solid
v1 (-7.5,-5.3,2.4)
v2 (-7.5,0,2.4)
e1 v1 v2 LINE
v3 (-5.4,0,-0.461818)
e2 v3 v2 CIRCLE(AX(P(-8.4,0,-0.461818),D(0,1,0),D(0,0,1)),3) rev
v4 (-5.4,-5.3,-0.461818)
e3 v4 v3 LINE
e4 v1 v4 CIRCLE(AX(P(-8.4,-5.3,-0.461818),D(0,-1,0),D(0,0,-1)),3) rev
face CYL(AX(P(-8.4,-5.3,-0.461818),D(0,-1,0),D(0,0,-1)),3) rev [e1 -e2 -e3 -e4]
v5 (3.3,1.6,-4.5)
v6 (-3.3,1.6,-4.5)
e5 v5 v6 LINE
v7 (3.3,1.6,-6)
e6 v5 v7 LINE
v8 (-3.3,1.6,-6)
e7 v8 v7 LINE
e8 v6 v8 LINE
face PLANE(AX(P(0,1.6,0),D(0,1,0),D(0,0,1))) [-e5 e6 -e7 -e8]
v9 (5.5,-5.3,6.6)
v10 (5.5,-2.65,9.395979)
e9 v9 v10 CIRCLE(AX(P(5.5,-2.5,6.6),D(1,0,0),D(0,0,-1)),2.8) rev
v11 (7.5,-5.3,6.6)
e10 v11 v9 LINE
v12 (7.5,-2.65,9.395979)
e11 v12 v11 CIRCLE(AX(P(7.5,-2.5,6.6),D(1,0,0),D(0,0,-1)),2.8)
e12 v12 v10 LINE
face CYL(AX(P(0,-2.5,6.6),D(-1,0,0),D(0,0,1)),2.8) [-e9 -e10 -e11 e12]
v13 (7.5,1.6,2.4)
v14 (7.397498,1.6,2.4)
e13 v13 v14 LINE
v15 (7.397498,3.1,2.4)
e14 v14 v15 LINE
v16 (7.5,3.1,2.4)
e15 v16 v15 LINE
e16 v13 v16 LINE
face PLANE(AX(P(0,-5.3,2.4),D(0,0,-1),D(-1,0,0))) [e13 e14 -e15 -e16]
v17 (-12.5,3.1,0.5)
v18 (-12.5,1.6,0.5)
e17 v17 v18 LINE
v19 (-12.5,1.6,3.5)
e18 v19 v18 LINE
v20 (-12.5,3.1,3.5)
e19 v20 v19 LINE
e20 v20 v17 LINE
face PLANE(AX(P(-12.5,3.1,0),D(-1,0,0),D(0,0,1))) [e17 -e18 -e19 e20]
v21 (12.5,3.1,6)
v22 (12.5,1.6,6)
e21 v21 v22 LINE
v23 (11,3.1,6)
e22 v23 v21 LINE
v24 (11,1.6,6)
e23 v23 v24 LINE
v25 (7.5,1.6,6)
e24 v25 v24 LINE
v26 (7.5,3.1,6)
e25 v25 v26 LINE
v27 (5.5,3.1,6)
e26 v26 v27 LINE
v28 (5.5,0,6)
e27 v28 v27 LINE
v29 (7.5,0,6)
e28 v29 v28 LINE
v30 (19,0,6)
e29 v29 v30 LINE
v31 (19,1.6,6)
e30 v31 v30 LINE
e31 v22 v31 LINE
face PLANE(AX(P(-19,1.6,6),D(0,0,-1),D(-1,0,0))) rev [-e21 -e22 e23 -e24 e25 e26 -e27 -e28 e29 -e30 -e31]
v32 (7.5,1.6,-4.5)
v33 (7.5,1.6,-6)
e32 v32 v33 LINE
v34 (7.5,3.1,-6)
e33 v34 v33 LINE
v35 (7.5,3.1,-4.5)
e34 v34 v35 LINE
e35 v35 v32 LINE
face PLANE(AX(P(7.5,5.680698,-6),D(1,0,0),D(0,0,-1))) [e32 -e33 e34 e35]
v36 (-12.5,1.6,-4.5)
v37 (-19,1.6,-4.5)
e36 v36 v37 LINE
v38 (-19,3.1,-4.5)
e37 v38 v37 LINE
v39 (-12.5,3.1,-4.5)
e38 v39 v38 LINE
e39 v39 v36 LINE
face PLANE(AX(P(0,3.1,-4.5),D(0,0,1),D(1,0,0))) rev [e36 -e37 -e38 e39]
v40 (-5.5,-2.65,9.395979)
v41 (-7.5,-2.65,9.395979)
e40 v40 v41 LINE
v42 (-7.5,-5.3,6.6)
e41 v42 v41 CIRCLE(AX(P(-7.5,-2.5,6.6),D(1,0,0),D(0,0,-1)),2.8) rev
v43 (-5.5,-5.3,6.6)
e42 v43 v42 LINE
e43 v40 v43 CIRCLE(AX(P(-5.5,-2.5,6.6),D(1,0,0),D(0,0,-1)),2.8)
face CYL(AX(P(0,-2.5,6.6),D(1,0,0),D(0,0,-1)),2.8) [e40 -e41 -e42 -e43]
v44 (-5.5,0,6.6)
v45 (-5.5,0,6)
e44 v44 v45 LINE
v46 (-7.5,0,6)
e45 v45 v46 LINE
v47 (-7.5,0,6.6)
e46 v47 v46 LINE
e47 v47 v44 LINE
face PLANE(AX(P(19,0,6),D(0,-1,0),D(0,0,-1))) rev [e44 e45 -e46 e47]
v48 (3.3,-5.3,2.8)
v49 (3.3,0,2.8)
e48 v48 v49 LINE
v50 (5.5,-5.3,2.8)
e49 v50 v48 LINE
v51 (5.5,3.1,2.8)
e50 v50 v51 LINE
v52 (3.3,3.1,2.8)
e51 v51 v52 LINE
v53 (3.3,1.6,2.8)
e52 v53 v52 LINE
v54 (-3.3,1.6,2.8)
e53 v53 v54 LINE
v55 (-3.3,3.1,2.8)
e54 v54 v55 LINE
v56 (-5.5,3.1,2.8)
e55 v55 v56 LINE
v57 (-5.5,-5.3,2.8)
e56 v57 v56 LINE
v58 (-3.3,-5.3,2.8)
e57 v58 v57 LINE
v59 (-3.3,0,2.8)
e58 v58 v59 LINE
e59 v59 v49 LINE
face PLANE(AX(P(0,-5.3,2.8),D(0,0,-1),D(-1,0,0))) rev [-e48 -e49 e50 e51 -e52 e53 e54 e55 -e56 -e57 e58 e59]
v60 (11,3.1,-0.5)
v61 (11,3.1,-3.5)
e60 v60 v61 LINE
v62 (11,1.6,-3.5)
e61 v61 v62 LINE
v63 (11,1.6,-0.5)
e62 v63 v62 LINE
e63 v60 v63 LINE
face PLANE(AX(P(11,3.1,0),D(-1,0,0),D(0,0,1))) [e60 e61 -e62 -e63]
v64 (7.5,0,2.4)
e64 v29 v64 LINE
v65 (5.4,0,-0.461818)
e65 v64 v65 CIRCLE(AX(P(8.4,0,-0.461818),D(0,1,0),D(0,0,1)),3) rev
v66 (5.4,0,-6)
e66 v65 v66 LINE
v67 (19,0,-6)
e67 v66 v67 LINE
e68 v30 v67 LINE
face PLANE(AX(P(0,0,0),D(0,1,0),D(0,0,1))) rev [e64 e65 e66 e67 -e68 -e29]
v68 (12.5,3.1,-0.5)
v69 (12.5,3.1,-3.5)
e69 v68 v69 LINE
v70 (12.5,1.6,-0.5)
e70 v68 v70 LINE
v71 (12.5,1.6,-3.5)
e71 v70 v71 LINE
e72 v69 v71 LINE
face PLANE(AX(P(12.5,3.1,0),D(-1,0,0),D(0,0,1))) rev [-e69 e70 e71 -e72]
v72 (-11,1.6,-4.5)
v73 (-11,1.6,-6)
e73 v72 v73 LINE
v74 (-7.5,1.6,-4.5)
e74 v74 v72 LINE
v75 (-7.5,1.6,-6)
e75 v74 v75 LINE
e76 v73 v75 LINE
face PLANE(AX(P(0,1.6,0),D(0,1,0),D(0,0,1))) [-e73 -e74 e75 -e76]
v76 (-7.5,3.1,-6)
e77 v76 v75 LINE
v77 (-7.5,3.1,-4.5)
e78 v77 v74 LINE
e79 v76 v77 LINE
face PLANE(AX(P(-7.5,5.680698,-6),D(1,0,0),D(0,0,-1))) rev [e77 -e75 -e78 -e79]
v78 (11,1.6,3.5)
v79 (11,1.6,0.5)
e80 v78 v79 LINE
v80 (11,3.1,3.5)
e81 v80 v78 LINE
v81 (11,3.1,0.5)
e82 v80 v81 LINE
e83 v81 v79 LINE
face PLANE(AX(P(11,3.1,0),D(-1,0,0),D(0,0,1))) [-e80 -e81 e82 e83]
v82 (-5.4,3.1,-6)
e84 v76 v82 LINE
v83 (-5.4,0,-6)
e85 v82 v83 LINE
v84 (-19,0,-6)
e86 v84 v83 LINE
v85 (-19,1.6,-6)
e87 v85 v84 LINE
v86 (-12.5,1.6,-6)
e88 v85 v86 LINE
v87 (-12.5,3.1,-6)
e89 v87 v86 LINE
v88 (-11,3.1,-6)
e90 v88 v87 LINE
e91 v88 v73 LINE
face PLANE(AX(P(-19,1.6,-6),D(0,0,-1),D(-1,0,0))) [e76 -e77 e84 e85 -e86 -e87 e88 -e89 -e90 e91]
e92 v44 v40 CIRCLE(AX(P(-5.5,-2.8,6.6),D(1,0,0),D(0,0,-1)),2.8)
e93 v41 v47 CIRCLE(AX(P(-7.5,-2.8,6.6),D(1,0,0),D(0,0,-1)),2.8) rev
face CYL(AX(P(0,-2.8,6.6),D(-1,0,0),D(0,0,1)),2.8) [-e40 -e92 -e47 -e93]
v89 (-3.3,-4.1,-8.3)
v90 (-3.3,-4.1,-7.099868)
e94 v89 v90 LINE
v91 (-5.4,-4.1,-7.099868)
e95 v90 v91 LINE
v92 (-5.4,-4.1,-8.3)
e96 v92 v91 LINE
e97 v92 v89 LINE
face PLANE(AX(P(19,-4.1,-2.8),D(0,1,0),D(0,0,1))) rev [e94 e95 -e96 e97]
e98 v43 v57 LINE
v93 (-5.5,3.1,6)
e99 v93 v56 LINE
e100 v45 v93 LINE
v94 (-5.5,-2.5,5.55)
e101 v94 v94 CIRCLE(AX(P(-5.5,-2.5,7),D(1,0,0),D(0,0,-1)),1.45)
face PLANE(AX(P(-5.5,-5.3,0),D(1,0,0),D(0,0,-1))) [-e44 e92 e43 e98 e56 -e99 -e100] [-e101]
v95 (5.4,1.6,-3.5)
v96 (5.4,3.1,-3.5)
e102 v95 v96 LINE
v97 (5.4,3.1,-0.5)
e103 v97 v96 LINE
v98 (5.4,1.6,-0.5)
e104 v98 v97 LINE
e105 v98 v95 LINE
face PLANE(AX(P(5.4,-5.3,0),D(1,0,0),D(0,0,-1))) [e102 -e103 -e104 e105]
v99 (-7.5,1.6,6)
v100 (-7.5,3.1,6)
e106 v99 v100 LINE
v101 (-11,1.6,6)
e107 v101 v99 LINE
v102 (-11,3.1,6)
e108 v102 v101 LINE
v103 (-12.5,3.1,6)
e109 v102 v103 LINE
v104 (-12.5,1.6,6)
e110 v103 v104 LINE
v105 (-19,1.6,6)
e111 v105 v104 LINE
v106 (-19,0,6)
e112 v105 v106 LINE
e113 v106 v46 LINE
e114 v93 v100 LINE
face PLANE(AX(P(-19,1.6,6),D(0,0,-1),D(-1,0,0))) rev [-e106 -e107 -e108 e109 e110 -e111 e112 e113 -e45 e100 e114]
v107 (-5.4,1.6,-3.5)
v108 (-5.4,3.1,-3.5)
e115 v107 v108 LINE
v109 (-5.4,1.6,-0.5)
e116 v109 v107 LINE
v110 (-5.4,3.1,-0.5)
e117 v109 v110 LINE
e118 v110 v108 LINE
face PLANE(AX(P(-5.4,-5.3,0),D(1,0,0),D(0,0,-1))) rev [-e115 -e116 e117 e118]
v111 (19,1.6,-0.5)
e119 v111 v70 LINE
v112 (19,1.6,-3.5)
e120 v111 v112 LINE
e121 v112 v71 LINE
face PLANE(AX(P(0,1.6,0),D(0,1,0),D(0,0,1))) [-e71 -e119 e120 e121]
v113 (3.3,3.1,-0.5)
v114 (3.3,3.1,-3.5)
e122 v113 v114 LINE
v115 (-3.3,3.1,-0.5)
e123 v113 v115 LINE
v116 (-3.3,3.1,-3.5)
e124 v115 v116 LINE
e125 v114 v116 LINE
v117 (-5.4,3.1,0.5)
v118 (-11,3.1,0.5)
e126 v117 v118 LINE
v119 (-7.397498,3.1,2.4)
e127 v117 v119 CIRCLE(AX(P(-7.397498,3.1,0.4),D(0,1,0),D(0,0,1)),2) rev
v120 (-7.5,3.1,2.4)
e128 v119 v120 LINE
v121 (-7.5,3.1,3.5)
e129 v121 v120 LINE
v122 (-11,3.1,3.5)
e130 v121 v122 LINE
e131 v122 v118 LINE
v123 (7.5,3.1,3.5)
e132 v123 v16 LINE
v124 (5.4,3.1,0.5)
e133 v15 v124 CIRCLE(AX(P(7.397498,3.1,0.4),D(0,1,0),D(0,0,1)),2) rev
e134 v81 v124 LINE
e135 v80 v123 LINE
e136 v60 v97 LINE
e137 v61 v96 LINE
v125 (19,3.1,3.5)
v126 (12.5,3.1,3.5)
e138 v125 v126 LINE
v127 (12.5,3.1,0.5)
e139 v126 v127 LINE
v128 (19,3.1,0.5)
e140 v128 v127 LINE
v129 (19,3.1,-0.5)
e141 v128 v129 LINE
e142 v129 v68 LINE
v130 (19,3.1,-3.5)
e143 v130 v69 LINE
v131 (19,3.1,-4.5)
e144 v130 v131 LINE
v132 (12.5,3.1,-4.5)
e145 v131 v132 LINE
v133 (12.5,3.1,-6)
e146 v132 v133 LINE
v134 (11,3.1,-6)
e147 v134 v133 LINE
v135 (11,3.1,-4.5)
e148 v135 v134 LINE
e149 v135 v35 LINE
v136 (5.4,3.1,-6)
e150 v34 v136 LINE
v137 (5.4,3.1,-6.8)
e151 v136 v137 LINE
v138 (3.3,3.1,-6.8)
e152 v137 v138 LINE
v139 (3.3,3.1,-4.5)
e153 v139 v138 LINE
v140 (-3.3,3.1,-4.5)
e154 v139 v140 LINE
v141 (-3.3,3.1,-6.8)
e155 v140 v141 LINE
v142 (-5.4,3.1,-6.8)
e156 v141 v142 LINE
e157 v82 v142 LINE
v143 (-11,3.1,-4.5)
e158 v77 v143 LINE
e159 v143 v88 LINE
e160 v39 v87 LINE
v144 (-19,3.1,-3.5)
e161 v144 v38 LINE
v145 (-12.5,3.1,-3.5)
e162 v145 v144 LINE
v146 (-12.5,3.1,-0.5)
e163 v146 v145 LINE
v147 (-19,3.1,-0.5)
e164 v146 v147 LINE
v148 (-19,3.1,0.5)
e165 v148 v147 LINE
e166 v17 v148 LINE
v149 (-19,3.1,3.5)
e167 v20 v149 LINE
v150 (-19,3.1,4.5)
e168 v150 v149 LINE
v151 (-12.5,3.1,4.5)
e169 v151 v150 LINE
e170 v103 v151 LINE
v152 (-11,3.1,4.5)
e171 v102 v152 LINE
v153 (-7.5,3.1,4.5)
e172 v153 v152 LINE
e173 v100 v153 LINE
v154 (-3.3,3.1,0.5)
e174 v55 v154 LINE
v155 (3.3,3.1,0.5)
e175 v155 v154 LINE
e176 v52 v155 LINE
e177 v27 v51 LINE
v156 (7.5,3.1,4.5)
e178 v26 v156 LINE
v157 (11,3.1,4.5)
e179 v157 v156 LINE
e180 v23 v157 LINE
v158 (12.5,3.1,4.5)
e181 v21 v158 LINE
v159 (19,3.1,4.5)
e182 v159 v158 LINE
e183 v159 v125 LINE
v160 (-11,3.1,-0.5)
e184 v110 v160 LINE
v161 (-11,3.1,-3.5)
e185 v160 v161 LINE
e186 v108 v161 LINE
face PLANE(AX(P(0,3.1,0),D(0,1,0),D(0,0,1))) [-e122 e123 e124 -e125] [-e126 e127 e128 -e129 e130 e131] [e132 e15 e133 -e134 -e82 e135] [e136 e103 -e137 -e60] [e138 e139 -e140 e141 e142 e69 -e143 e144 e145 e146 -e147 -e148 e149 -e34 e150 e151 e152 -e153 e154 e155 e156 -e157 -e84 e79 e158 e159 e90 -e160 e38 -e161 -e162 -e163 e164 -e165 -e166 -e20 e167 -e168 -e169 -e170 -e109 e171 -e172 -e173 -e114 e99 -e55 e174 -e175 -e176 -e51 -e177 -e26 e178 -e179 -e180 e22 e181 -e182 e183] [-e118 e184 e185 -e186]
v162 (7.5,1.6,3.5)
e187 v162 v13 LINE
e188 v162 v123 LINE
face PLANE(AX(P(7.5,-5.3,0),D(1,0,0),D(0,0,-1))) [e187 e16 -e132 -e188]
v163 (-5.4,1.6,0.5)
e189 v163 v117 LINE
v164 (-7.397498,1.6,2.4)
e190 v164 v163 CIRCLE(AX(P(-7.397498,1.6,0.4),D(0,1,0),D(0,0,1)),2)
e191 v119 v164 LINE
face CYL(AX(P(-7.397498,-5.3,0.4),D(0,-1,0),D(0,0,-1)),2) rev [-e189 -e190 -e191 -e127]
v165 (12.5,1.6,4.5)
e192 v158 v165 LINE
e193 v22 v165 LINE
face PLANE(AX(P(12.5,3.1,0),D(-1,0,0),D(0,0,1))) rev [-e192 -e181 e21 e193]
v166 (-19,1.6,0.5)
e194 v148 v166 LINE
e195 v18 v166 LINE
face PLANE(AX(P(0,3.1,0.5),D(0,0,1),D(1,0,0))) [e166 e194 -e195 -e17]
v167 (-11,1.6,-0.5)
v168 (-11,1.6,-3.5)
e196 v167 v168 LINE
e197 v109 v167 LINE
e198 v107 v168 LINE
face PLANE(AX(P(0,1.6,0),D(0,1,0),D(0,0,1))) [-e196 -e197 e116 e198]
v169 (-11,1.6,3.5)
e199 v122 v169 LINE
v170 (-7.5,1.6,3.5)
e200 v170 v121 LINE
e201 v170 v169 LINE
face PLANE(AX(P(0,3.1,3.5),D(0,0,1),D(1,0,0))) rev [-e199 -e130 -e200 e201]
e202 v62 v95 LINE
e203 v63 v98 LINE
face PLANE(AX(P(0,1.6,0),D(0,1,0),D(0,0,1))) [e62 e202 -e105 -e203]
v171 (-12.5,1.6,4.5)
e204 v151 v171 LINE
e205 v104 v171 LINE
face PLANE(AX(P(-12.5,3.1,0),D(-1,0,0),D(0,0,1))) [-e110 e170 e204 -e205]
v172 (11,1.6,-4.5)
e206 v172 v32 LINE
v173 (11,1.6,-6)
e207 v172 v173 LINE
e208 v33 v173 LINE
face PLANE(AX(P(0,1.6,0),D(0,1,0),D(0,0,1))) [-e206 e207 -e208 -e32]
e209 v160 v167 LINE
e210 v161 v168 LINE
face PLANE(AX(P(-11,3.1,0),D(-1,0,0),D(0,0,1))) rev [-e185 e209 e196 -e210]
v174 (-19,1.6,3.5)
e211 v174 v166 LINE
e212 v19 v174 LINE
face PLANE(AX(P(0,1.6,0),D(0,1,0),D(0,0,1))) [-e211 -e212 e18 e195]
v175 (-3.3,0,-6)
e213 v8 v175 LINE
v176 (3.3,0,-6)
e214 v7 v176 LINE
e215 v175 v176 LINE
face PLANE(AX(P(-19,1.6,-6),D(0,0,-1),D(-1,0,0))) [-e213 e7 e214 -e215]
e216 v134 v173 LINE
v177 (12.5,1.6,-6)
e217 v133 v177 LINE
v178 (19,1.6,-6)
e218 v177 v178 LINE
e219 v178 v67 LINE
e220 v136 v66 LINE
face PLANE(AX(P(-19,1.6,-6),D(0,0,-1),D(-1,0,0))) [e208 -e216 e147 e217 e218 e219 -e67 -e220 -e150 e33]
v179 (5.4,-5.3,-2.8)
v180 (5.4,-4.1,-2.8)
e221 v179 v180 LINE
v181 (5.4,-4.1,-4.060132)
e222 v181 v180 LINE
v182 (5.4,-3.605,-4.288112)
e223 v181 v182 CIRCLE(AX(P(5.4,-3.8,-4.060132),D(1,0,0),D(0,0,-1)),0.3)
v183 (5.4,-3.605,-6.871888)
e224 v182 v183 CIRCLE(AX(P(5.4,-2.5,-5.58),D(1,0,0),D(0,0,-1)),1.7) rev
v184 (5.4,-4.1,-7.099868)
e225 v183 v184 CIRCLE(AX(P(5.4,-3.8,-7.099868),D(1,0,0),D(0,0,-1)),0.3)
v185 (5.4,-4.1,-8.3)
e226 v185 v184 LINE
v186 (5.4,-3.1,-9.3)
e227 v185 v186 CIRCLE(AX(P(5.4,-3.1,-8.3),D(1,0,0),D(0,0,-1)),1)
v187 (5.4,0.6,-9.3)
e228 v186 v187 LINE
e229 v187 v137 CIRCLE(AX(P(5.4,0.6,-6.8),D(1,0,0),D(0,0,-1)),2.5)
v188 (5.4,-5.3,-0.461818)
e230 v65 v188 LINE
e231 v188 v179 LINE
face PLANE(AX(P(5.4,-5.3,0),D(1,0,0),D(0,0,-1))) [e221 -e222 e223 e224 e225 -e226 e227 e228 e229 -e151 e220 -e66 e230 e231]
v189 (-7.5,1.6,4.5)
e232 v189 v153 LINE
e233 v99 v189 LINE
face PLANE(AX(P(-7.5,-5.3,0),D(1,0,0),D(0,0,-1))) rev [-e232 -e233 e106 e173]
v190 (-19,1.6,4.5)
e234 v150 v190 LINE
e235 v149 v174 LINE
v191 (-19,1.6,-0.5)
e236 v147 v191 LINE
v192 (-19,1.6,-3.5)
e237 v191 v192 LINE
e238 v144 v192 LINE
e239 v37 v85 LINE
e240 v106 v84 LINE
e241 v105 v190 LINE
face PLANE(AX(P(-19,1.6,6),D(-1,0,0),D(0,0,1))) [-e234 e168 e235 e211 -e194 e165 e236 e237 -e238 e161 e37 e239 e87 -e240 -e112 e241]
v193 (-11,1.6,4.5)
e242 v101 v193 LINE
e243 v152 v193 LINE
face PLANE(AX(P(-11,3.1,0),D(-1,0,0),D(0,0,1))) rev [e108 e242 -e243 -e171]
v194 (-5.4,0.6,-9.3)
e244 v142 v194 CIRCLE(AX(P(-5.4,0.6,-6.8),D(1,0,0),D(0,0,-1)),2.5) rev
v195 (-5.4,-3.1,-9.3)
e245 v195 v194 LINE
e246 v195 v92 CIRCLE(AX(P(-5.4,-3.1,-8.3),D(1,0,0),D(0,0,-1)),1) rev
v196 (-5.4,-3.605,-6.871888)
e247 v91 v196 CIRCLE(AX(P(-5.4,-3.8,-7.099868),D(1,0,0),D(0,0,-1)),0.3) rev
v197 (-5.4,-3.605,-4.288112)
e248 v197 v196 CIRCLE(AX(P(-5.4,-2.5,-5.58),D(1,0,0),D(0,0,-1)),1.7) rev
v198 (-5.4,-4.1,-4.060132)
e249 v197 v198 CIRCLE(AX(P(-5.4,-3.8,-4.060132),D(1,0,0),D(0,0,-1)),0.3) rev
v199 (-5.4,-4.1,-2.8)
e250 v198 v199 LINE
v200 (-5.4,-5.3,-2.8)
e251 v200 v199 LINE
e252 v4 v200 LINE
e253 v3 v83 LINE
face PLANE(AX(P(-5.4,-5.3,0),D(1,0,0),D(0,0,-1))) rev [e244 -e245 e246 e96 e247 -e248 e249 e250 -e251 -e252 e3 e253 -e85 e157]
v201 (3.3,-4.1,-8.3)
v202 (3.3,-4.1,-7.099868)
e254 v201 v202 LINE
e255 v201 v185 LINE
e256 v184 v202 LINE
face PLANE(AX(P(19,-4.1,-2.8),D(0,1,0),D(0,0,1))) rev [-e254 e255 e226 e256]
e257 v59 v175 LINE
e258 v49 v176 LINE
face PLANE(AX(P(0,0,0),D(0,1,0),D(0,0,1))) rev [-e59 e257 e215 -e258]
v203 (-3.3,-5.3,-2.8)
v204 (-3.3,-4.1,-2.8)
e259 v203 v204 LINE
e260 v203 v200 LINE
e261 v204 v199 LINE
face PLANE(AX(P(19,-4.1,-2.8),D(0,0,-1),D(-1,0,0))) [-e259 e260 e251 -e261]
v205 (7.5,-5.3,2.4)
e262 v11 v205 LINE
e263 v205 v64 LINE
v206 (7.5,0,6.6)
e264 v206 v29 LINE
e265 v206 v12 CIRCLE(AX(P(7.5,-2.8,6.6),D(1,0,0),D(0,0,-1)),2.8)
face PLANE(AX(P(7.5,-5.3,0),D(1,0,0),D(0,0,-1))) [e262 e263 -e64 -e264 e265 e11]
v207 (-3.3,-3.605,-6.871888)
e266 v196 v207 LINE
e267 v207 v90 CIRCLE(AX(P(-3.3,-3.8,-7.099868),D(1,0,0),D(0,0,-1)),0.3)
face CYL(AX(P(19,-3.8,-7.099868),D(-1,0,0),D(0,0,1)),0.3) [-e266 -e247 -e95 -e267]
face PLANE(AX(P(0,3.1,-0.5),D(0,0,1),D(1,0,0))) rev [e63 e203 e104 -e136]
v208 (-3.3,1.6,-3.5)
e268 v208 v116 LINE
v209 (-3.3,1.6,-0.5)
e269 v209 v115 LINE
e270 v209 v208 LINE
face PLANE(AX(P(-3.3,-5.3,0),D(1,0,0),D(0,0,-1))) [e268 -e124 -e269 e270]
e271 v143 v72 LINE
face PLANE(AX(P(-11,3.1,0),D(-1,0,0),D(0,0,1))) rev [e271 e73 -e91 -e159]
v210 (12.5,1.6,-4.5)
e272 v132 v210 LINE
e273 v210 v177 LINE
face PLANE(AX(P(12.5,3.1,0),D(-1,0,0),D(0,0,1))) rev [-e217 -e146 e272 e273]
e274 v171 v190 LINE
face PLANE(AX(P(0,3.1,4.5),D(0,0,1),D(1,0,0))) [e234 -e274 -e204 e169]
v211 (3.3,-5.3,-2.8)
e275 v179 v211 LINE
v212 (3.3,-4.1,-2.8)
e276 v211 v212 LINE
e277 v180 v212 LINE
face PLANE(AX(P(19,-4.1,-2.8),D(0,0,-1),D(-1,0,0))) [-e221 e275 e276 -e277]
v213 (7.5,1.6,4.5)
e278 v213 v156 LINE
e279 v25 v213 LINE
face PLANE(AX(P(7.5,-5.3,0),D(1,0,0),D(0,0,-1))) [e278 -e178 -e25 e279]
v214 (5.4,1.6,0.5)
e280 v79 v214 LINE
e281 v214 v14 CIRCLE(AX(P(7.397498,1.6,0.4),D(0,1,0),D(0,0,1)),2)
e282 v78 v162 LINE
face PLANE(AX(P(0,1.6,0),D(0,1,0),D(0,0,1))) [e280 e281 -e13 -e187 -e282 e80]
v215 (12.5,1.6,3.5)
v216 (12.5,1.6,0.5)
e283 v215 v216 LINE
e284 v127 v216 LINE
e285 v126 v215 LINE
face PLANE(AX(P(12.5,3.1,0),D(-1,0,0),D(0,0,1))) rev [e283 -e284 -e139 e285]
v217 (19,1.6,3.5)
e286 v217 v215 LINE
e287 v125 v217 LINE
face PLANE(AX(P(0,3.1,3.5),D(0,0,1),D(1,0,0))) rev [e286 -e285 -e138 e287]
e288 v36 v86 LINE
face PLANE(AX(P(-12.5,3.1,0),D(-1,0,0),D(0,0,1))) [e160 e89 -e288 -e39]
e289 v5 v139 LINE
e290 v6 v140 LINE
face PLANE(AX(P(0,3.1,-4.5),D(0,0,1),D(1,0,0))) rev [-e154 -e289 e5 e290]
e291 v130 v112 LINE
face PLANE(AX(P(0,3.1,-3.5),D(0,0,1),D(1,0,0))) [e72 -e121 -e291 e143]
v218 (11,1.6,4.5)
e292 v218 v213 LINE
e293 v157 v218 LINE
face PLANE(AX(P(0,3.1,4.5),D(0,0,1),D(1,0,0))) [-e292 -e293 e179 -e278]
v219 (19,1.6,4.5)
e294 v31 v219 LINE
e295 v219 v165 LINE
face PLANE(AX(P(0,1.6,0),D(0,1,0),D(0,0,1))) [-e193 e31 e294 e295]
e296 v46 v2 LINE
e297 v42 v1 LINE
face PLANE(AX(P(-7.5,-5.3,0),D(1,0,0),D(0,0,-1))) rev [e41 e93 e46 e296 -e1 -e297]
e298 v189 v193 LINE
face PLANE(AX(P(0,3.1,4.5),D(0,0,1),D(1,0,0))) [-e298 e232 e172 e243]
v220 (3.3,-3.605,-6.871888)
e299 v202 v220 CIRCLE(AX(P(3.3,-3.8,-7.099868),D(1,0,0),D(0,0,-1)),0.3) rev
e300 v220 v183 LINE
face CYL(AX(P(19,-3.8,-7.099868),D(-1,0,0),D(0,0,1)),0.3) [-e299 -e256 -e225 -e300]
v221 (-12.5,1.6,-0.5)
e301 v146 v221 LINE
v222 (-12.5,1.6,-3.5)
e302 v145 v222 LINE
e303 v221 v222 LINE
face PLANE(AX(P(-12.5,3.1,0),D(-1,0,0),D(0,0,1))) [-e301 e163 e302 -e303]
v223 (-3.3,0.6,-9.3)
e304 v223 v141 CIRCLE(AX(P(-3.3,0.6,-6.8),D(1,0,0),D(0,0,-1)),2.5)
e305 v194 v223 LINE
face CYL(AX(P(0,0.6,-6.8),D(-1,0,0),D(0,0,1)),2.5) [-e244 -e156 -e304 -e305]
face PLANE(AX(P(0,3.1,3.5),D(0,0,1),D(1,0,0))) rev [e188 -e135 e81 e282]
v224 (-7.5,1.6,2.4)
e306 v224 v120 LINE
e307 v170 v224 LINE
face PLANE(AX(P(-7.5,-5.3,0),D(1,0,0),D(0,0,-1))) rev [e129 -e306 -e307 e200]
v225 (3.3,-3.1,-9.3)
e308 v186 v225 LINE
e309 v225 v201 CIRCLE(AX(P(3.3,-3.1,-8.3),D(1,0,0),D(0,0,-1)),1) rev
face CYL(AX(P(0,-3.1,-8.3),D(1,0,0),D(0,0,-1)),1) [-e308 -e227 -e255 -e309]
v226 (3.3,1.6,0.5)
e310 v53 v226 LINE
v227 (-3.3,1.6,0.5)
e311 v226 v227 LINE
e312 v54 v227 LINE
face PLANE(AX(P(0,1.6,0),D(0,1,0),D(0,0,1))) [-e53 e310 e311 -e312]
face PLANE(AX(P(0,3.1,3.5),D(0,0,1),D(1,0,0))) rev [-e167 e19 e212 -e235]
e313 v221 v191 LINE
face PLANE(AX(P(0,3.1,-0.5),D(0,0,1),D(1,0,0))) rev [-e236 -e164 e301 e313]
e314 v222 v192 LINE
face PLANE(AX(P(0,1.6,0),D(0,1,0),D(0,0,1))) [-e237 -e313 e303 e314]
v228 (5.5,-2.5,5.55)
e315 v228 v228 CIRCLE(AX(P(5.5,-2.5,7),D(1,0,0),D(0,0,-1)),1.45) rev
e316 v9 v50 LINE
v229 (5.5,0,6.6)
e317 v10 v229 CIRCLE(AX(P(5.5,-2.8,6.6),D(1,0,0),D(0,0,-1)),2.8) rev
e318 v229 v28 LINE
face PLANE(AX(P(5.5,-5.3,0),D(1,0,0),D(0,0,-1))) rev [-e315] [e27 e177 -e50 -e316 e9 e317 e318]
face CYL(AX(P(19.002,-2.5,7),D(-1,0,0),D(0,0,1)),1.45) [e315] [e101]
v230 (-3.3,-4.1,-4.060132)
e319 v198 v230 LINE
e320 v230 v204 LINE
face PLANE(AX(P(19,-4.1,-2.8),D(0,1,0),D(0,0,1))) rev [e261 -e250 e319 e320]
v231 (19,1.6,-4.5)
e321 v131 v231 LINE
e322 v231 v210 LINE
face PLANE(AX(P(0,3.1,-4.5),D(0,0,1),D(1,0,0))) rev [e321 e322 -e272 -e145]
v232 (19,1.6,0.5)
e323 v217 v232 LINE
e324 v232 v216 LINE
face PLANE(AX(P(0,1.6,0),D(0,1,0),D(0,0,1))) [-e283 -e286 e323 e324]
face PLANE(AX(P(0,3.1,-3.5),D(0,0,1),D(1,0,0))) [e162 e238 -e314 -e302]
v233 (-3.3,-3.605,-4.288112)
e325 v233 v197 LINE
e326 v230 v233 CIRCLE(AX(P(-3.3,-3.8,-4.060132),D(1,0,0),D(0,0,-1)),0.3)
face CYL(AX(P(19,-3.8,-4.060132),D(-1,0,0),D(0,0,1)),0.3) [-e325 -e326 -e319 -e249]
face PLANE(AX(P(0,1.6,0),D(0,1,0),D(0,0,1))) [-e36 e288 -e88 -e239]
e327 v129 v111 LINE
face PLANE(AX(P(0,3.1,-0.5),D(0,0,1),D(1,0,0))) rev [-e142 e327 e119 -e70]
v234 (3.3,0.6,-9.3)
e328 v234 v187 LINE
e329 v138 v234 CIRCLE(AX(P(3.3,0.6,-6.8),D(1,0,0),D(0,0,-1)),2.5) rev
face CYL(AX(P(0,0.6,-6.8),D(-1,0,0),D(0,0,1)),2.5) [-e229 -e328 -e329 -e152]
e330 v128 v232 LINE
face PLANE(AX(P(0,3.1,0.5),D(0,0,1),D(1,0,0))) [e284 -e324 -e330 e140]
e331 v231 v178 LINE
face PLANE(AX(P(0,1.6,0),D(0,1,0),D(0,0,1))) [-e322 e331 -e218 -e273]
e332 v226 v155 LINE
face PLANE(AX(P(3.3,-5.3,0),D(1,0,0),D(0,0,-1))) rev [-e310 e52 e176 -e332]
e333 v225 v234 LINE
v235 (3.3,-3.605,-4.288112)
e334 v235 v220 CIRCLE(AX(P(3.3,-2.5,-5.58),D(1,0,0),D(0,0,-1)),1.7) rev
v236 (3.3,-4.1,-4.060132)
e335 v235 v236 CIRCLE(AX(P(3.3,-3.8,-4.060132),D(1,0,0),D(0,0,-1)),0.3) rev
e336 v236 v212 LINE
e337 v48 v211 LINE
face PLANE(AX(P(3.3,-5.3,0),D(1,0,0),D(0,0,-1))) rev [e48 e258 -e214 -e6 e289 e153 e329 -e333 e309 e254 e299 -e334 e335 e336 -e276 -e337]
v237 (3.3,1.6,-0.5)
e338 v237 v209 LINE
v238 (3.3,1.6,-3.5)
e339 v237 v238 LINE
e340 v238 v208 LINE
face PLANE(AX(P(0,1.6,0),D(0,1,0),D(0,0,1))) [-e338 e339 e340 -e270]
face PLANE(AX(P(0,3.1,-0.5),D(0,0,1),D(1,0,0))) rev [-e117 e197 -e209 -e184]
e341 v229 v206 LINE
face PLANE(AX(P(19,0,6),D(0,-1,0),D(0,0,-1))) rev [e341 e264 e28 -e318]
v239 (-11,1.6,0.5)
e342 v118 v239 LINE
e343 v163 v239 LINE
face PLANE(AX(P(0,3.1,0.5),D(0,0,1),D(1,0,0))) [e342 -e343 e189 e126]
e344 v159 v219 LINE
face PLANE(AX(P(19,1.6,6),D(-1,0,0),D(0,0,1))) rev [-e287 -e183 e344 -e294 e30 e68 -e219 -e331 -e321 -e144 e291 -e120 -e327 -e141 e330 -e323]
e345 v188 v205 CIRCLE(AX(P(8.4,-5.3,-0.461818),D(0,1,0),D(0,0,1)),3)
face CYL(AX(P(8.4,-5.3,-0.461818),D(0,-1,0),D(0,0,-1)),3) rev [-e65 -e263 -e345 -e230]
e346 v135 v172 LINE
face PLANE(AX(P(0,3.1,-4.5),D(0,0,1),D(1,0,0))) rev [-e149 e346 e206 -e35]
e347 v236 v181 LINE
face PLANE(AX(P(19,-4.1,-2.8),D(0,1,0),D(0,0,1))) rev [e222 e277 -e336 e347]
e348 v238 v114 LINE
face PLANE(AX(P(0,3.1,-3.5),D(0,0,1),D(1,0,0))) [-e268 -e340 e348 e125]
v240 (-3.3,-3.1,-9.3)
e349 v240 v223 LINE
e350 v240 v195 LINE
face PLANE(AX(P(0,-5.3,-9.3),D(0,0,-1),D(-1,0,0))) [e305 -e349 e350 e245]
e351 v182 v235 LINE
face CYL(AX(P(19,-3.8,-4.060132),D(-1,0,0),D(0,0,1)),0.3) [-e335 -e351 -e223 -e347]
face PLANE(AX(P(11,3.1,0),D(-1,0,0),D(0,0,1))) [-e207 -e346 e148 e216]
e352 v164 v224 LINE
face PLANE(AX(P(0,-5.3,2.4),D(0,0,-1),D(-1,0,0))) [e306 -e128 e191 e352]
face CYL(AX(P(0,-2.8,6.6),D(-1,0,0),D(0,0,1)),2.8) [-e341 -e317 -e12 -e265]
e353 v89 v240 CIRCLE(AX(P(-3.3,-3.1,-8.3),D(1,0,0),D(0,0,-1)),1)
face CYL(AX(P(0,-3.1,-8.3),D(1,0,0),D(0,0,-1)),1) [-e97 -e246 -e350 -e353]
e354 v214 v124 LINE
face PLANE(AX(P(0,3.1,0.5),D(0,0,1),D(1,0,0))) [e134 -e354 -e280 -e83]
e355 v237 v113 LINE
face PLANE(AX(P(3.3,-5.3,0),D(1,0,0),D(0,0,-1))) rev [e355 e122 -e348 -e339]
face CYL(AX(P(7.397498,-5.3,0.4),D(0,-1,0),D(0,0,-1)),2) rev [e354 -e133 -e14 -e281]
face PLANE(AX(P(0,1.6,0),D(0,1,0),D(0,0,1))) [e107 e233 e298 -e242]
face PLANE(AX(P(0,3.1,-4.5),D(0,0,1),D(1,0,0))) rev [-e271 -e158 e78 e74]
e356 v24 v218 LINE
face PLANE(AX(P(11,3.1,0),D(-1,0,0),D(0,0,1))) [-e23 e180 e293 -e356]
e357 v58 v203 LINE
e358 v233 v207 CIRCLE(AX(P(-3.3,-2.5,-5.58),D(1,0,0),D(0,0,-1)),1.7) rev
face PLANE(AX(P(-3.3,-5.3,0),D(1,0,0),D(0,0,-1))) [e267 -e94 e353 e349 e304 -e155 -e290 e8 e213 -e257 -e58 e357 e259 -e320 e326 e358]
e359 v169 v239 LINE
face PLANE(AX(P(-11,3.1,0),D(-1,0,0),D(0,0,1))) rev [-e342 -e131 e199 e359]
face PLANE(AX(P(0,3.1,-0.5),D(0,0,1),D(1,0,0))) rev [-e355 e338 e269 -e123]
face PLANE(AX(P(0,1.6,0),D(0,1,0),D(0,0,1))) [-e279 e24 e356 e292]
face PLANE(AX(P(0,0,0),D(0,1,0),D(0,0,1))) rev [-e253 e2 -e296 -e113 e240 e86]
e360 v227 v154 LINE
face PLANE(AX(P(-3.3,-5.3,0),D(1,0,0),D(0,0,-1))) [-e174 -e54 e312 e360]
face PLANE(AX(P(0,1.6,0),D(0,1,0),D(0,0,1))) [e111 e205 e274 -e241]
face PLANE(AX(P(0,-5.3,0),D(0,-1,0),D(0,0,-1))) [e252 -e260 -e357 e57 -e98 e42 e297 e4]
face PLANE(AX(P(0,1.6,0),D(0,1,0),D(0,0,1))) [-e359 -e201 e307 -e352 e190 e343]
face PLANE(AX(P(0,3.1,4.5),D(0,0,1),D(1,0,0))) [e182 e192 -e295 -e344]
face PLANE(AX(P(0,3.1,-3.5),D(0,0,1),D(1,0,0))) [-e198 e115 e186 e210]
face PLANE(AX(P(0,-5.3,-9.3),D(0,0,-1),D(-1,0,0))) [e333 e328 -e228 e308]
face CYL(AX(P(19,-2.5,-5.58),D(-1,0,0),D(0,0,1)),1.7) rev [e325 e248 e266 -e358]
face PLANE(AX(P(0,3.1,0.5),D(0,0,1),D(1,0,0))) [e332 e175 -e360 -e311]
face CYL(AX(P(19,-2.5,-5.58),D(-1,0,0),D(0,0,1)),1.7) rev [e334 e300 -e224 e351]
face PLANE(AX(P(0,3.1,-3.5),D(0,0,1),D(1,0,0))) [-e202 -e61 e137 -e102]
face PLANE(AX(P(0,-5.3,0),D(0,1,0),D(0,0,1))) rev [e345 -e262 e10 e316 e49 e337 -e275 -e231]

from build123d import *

# Parameters (mm, degrees)
SKETCH_1_W               = 38
SKETCH_1_H               = 12
EXTRUDE_1_DEPTH          = 1.6
EXTRUDE_START            = 1.6
SKETCH_1_3_W             = 38
SKETCH_1_3_H             = 1
SKETCH_1_3_W_2           = 1.5
SKETCH_1_3_H_2           = 12
EXTRUDE_2_DEPTH          = 1.5
EXTRUDE_START_2          = 3.1
EXTRUDE_3_DEPTH          = 8.4
SKETCH_2_4_W             = 2.1
SKETCH_2_4_H             = 1.5
EXTRUDE_5_DEPTH          = 3.1
CUT_EXTRUDE_1_DEPTH      = 22.850629282
FILLET_1_R               = 3
EXTRUDE_4_REACH          = 28.771
SKETCH_3_R               = 1.45
CUT_EXTRUDE_2_DEPTH      = 27.771253239
CUT_EXTRUDE_2_DEPTH_BACK = 27.771253239
SKETCH_3_3_R             = 1.7
SKETCH_3_3_W             = 6.5
SKETCH_3_3_H             = 1.2
SKETCH_3_3_W_2           = 3.4
SKETCH_3_3_H_2           = 3.1
FILLET_2_R               = 2.8
FILLET_3_R               = 2.5
FILLET_4_R               = 1
FILLET_5_R               = 0.3
FILLET_6_R               = 2


with BuildPart() as part:
    # 草图1 → 凸台-拉伸1 (new body)
    with BuildSketch(Plane(origin=(0, 0, 0), x_dir=(1, 0, 0), z_dir=(0, 1, 0))):
        Rectangle(SKETCH_1_W, SKETCH_1_H)
    extrude(amount=EXTRUDE_1_DEPTH)

    # 草图1<3> → 凸台-拉伸2 (add)
    with BuildSketch(Plane(origin=(0, 0, 0), x_dir=(1, 0, 0), z_dir=(0, 1, 0)).offset(EXTRUDE_START)):
        with Locations((0, 4)):
            Rectangle(SKETCH_1_3_W, SKETCH_1_3_H)
        Rectangle(SKETCH_1_3_W, SKETCH_1_3_H)
        with Locations((0, -4)):
            Rectangle(SKETCH_1_3_W, SKETCH_1_3_H)
        with Locations((-11.75, 0)):
            Rectangle(SKETCH_1_3_W_2, SKETCH_1_3_H_2)
        with Locations((11.75, 0)):
            Rectangle(SKETCH_1_3_W_2, SKETCH_1_3_H_2)
    extrude(amount=EXTRUDE_2_DEPTH)

    # 草图2 → 凸台-拉伸3 (add)
    with BuildSketch(Plane(origin=(0, 0, 0), x_dir=(1, 0, 0), z_dir=(0, 1, 0)).offset(EXTRUDE_START_2)):
        Polygon((-3.3, 9.3), (-5.4, 9.3), (-5.4, -2.4), (-7.5, -2.4), (-7.5, -9.4), (-5.5, -9.4), (-5.5, -2.8), (-3.3, -2.8), align=None)
        Polygon((5.4, 9.3), (3.3, 9.3), (3.3, -2.8), (5.5, -2.8), (5.5, -9.4), (7.5, -9.4), (7.5, -2.4), (5.4, -2.4), align=None)
    extrude(amount=-EXTRUDE_3_DEPTH)

    # 草图2<4> → 凸台-拉伸5 (add)
    with BuildSketch(Plane(origin=(0, 0, 0), x_dir=(1, 0, 0), z_dir=(0, 1, 0))):
        with Locations((-6.45, 5.25)):
            Rectangle(SKETCH_2_4_W, SKETCH_2_4_H)
        with Locations((6.45, 5.25)):
            Rectangle(SKETCH_2_4_W, SKETCH_2_4_H)
    extrude(amount=EXTRUDE_5_DEPTH)

    # 草图2<3> → 切除-拉伸1 (cut, through all)
    with BuildSketch(Plane(origin=(0, 0, 0), x_dir=(1, 0, 0), z_dir=(0, 1, 0))):
        Polygon((0, -9.4), (0, -2.8), (-3.3, -2.8), (-5.4, -2.8), (-5.5, -2.8), (-5.5, -9.4), align=None)
        Polygon((3.3, -2.8), (0, -2.8), (0, -9.4), (5.5, -9.4), (5.5, -2.8), (5.4, -2.8), align=None)
    extrude(amount=CUT_EXTRUDE_1_DEPTH, mode=Mode.SUBTRACT)

    # 圆角1
    # the kernel refuses this fillet: 3 mm, written as the material it adds along each edge
    with BuildSketch(Plane(origin=(5.4, 7.154544011, 2.4), x_dir=(1, 0, 0), z_dir=(0, -1, 0))) as fillet_1_piece_1_section:
        with BuildLine():
            CenterArc((3, -2.861817604), FILLET_1_R, 107.457603124, 72.542396876)
            Line((0, -2.861817604), (0, 0))
            Line((0, 0), (2.1, 0))
        make_face()
    fillet_1_piece_1 = extrude(amount=12.454544011, mode=Mode.PRIVATE)
    fillet_1_piece_1 = split(fillet_1_piece_1, bisect_by=Plane(origin=(6.297598678, 1.6, 1.686657362), z_dir=(0, -1, 0)), keep=Keep.TOP, mode=Mode.PRIVATE)
    add(fillet_1_piece_1)
    with BuildSketch(Plane(origin=(-5.4, 0, 2.4), x_dir=(0, 0, -1), z_dir=(0, -1, 0))) as fillet_1_piece_2:
        with BuildLine():
            CenterArc((2.861817604, -3), FILLET_1_R, 90, 72.542396876)
            Line((0, -2.1), (0, 0))
            Line((0, 0), (2.861817604, 0))
        make_face()
    extrude(amount=5.3)

    # 草图3 → 凸台-拉伸4 (add, up to next)
    with BuildSketch(Plane(origin=(-5.5, 0, 0), x_dir=(0, 0, -1), z_dir=(1, 0, 0)), mode=Mode.PRIVATE) as extrude_4_sk1:
        with Locations((-7, -2.5)):
            Circle(SKETCH_3_R)
    extrude_4_tool1 = extrude(extrude_4_sk1.sketch, amount=EXTRUDE_4_REACH, mode=Mode.PRIVATE) - part.part
    add(extrude_4_tool1.solids().sort_by_distance((-5.5, -2.5, 7))[0])

    # 草图3<3> → 切除-拉伸2 (cut, two sides: drawn at the far end of the back side and taken through both)
    with BuildSketch(Plane(origin=(-5.5, 0, 0), x_dir=(0, 0, -1), z_dir=(1, 0, 0)).offset(-CUT_EXTRUDE_2_DEPTH_BACK)):
        with Locations((5.58, -2.5)):
            Circle(SKETCH_3_3_R)
        with Locations((6.05, -4.7)):
            Rectangle(SKETCH_3_3_W, SKETCH_3_3_H)
        with Locations((-7.7, 1.55)):
            Rectangle(SKETCH_3_3_W_2, SKETCH_3_3_H_2)
    extrude(amount=CUT_EXTRUDE_2_DEPTH + CUT_EXTRUDE_2_DEPTH_BACK, mode=Mode.SUBTRACT)

    # 圆角2
    # the kernel refuses this fillet: 2.8 mm, written as the material it takes off along each edge
    with BuildSketch(Plane(origin=(-1.5, 0, 9.4), x_dir=(0, 0, -1), z_dir=(1, 0, 0)), Plane(origin=(-14.5, 0, 9.4), x_dir=(0, 0, -1), z_dir=(1, 0, 0))) as fillet_2_piece_1:
        with BuildLine():
            CenterArc((FILLET_2_R, -FILLET_2_R), FILLET_2_R, 90, 90)
            Line((0, -FILLET_2_R), (0, 0))
            Line((0, 0), (FILLET_2_R, 0))
        make_face()
    extrude(amount=16, mode=Mode.SUBTRACT)
    with BuildSketch(Plane(origin=(-1.5, -5.3, 9.4), x_dir=(0, 0, -1), z_dir=(1, 0, 0)), Plane(origin=(-14.5, -5.3, 9.4), x_dir=(0, 0, -1), z_dir=(1, 0, 0))) as fillet_2_piece_2:
        with BuildLine():
            CenterArc((FILLET_2_R, FILLET_2_R), FILLET_2_R, 180, 90)
            Line((0, FILLET_2_R), (0, 0))
            Line((0, 0), (FILLET_2_R, 0))
        make_face()
    extrude(amount=16, mode=Mode.SUBTRACT)

    # 圆角3
    fillet_3_edges = [part.edges().sort_by_distance(p)[0] for p in [
        (-4.35, 3.1, -9.3),
        (4.35, 3.1, -9.3),
    ]]
    fillet(fillet_3_edges, radius=FILLET_3_R)

    # 圆角4
    fillet_4_edges = [part.edges().sort_by_distance(p)[0] for p in [
        (-4.35, -4.1, -9.3),
        (4.35, -4.1, -9.3),
    ]]
    fillet(fillet_4_edges, radius=FILLET_4_R)

    # 圆角5
    fillet_5_edges = [part.edges().sort_by_distance(p)[0] for p in [
        (-4.35, -4.1, -5.005543735),
        (4.35, -4.1, -5.005543735),
        (-4.35, -4.1, -6.154456265),
        (4.35, -4.1, -6.154456265),
    ]]
    fillet(fillet_5_edges, radius=FILLET_5_R)

    # 圆角6
    # the kernel refuses this fillet: 2 mm, written as the material it adds along each edge
    with BuildSketch(Plane(origin=(5.4, 3.1, 2.4), x_dir=(0, 0, -1), z_dir=(0, -1, 0))) as fillet_6_piece_1:
        with BuildLine():
            CenterArc((2, 1.997498436), FILLET_6_R, 180, 87.134016017)
            Line((0, 1.997498436), (-0.04, 1.997498436))
            Line((-0.04, 1.997498436), (-0.04, 0))
            Line((-0.04, 0), (0, -0.04))
            ThreePointArc((0, -0.04), (0.95, -0.04), (1.898, -0.039949969))
            Line((1.898, -0.039949969), (1.9, 0))
        make_face()
    extrude(amount=6.493746089)
    with BuildSketch(Plane(origin=(-5.4, 3.1, 2.4), x_dir=(-1, 0, 0), z_dir=(0, -1, 0))) as fillet_6_piece_2:
        with BuildLine():
            CenterArc((1.997498436, 2), FILLET_6_R, 182.865983983, 87.134016017)
            Line((0, 1.9), (-0.039949969, 1.898))
            ThreePointArc((-0.039949969, 1.898), (-0.04, 0.95), (-0.04, 0))
            Line((-0.04, 0), (0, -0.04))
            Line((0, -0.04), (1.997498436, -0.04))
            Line((1.997498436, -0.04), (1.997498436, 0))
        make_face()
    extrude(amount=6.493746089)


solid = part.part
